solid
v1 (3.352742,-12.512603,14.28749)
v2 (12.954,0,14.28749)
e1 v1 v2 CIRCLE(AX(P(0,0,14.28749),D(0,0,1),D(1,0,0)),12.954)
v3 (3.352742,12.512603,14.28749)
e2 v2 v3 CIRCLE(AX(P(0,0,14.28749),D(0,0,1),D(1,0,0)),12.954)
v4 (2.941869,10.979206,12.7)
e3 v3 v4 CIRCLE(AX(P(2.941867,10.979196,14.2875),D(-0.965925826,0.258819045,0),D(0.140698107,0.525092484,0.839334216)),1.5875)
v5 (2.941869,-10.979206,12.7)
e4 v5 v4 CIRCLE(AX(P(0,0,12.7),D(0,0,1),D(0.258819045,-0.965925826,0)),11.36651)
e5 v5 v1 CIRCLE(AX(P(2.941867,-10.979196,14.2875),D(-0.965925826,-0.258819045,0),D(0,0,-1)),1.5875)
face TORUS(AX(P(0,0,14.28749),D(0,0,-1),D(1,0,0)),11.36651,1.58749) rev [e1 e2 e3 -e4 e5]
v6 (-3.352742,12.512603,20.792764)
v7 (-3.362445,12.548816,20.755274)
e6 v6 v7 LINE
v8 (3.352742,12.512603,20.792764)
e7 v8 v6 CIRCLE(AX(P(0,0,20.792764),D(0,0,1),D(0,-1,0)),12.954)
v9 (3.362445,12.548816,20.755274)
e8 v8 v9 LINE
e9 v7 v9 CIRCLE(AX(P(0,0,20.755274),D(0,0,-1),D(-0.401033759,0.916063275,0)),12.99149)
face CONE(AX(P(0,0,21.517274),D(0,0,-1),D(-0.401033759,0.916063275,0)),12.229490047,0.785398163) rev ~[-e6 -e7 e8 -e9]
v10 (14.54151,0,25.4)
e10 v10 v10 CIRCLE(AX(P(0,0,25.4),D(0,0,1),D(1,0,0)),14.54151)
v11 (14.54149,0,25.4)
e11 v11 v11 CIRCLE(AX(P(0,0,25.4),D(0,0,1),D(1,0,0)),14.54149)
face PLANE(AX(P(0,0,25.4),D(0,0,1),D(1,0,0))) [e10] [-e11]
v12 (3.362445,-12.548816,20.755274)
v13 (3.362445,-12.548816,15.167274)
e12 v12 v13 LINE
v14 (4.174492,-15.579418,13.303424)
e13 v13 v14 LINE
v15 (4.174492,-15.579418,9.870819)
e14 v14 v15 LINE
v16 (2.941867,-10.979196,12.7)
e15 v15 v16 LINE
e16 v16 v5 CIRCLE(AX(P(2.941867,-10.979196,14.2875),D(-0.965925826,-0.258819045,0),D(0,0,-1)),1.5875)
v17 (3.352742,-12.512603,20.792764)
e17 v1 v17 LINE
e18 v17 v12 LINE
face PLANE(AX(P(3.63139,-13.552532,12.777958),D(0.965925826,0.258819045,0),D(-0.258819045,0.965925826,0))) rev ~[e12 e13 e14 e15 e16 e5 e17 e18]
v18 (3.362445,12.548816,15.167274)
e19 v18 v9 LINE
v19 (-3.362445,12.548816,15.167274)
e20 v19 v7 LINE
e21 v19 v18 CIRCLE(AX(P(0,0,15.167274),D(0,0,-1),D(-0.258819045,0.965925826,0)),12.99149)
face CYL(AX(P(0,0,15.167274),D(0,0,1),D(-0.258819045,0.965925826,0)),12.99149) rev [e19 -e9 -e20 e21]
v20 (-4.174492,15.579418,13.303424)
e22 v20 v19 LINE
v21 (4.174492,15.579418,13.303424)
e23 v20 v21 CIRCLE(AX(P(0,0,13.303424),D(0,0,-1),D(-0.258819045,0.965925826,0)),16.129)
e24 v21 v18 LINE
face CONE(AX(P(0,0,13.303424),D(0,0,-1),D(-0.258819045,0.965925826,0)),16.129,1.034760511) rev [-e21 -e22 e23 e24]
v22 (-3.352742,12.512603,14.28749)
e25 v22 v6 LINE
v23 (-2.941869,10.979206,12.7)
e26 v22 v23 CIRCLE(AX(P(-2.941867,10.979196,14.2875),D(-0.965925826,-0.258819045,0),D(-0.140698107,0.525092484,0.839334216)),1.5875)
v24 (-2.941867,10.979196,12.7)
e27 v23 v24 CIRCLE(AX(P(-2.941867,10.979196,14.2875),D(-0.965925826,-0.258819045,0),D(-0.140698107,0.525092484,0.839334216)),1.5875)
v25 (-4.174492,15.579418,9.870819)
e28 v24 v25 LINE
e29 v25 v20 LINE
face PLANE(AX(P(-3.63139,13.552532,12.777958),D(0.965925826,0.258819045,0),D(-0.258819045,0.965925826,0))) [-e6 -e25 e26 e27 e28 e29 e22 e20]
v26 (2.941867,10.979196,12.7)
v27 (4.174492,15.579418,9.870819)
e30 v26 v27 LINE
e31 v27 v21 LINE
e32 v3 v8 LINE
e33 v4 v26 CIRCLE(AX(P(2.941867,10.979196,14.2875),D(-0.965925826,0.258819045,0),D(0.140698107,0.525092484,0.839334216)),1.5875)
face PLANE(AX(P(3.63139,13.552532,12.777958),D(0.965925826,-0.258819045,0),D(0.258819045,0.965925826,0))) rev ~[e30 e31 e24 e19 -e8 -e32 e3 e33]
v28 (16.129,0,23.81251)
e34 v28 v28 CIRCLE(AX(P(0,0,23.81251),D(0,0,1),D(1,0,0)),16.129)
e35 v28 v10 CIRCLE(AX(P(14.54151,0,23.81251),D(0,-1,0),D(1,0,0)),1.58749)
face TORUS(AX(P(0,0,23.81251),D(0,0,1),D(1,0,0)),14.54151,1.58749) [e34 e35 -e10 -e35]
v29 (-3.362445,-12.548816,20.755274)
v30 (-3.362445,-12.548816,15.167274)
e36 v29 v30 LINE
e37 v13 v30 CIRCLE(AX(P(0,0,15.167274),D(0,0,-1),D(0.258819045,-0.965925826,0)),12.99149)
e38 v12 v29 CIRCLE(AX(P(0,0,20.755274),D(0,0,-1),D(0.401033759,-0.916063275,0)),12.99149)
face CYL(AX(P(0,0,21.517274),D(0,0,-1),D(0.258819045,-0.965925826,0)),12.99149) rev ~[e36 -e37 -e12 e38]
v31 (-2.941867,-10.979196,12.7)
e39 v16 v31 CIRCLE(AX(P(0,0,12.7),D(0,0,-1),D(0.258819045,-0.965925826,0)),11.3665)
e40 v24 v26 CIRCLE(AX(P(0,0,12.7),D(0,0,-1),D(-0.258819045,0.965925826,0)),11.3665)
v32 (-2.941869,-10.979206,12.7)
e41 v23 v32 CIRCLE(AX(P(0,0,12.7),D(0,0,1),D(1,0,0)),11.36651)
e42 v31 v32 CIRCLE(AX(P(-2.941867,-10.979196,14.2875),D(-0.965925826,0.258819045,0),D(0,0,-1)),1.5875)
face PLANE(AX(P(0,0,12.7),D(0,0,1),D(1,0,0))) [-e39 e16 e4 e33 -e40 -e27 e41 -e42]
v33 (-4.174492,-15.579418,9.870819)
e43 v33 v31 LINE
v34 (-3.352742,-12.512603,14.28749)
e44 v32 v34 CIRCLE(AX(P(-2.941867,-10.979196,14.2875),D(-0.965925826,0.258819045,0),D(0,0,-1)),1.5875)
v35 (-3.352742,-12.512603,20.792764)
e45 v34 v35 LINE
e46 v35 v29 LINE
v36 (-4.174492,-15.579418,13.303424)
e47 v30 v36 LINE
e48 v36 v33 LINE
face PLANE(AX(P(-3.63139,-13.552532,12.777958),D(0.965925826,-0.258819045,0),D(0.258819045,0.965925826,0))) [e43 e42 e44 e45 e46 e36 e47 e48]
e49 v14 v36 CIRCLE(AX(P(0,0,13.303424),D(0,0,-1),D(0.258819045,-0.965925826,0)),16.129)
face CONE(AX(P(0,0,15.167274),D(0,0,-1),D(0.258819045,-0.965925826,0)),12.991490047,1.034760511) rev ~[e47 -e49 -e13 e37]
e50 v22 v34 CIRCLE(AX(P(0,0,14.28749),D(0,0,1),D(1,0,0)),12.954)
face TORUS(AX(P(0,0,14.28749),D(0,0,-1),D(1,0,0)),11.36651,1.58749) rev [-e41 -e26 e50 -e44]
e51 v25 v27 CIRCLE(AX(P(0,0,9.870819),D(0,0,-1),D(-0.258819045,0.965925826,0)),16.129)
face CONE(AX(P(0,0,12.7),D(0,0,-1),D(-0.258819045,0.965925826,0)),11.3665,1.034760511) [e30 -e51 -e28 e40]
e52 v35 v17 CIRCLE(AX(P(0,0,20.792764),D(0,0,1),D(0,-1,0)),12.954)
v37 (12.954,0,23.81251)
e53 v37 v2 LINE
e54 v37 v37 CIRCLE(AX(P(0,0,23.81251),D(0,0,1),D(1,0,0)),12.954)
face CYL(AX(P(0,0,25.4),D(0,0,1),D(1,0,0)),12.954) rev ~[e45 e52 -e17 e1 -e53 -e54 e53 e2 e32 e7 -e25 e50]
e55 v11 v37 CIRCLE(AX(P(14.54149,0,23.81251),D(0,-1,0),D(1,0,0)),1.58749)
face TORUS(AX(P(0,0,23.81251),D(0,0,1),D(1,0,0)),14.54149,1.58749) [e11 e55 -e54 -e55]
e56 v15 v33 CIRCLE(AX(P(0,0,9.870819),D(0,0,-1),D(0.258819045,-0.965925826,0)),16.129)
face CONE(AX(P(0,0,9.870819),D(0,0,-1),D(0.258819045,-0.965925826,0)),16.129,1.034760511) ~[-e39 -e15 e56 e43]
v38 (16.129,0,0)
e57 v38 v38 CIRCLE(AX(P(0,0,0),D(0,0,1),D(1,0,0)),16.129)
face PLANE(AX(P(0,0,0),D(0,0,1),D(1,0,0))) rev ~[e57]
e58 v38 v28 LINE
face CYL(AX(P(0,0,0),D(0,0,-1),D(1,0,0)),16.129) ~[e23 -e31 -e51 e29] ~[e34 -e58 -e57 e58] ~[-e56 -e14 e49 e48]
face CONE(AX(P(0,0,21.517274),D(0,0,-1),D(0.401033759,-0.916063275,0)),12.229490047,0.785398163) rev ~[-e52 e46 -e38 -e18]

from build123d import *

# Parameters (mm, degrees)
F1_R          = 16.129
F2_DEPTH      = 25.4
F3_R          = 12.954
F4_DEPTH      = 12.7
F5_R          = 1.58749
F7_ANGLE_BACK = 15
F7_ANGLE      = 30
F8_T4_ANGLE   = 47.2856392703
F8_S5_R       = 12.954
F8_T6_DEPTH   = 7
F8_T10_ANGLE  = 47.2856392703
F8_S11_R      = 12.954
F8_T12_DEPTH  = 7


# Not quite as in the source:
# - a fillet or chamfer that OpenCascade refuses, or shapes differently, is made with other operations: its cross-section is extruded or revolved along the edge and cut away or added
# - a fillet or chamfer is up to 0.001 mm smaller than in the source, because OpenCascade refuses the exact size
# - ends of sketch curves that miss each other by under 0.0002 mm in the source are joined


with BuildPart() as f2:
    # F1 (on Top) → F2 (new body)
    with BuildSketch(Plane.XY):
        Circle(F1_R)
    extrude(amount=F2_DEPTH)

    # F3 (on face) → F4 (cut)
    with BuildSketch(Plane.XY.offset(25.4)):
        Circle(F3_R)
    extrude(amount=-F4_DEPTH, mode=Mode.SUBTRACT)

    # F5 (radius 1.5875 in the source; OpenCascade refuses exactly that, so slightly less here)
    f5_edges = [f2.edges().sort_by_distance(p)[0] for p in [
        (-16.129, 0, 25.4),
        (-12.954, 0, 25.4),
        (-12.954, 0, 12.7),
    ]]
    fillet(f5_edges, radius=F5_R)

    # F6 (on Right) → F7 (revolve, cut)
    with BuildSketch(Plane.YZ, mode=Mode.PRIVATE) as f7_sk:
        with BuildLine():
            ThreePointArc((12.2294899884, 15.6199430682), (12.8889010018, 13.8375539592), (11.3665, 12.7))
            Line((11.3665, 12.7), (16.129, 9.8708188202))
            Line((16.129, 9.8708188202), (16.129, 13.3034244871))
            Line((16.129, 13.3034244871), (12.9914900466, 15.1672741693))
            Line((12.9914900466, 15.1672741693), (12.2294899884, 15.6199430682))
        make_face()
        with BuildLine():
            Line((-16.129, 9.8708188202), (-11.3665, 12.7))
            ThreePointArc((-11.3665, 12.7), (-12.8889010018, 13.8375539592), (-12.2294899884, 15.6199430682))
            Line((-12.2294899884, 15.6199430682), (-12.9914900466, 15.1672741693))
            Line((-12.9914900466, 15.1672741693), (-16.129, 13.3034244871))
            Line((-16.129, 13.3034244871), (-16.129, 9.8708188202))
        make_face()
        Polygon((12.2294900466, 21.5172741693), (12.2294900466, 15.6199431581), (12.9914900466, 15.1672741693), (12.9914900466, 21.5172741693), align=None)
        Polygon((-12.9914900466, 15.1672741693), (-12.2294900466, 15.6199431581), (-12.2294900466, 21.5172741693), (-12.9914900466, 21.5172741693), align=None)
    revolve(f7_sk.sketch.rotate(Axis((0, 0, 7.0286970586), (0, 0, -1)), -F7_ANGLE_BACK), axis=Axis((0, 0, 7.0286970586), (0, 0, -1)), revolution_arc=F7_ANGLE, mode=Mode.SUBTRACT)

    # F8: chamfer of 0.762 on 2 edges, made by hand


with BuildPart() as f8_tool2:
    # F8_s3 → F8_t4 (revolve)
    with BuildSketch(Plane(origin=(0, 0, 0), x_dir=(0, 0, 1), z_dir=(0.9160632754, 0.4010337585, 0))):
        Polygon((21.5172741693, 12.2294900466), (20.7552741693, 12.9914900466), (21.5172741693, 12.9914900466), align=None)
    revolve(axis=Axis((0, 0, 21.5172741693), (0, 0, -1)), revolution_arc=F8_T4_ANGLE)

    # F8_s5 → F8_t6 (cut, symmetric)
    with BuildSketch(Plane.XY.offset(21.1)):
        Circle(F8_S5_R)
    extrude(amount=F8_T6_DEPTH, both=True, mode=Mode.SUBTRACT)


with BuildPart() as f2_1:
    add(f2.part)

    # F8_t1: union F8_tool2
    add(f8_tool2.part)


with BuildPart() as f8_tool8:
    # F8_s9 → F8_t10 (revolve)
    with BuildSketch(Plane(origin=(0, 0, 0), x_dir=(0, 0, 1), z_dir=(-0.9160632754, -0.4010337585, 0))):
        Polygon((21.5172741693, 12.2294900466), (20.7552741693, 12.9914900466), (21.5172741693, 12.9914900466), align=None)
    revolve(axis=Axis((0, 0, 21.5172741693), (0, 0, -1)), revolution_arc=F8_T10_ANGLE)

    # F8_s11 → F8_t12 (cut, symmetric)
    with BuildSketch(Plane.XY.offset(21.1)):
        Circle(F8_S11_R)
    extrude(amount=F8_T12_DEPTH, both=True, mode=Mode.SUBTRACT)


with BuildPart() as f2_2:
    add(f2_1.part)

    # F8_t7: union F8_tool8
    add(f8_tool8.part)


solid = f2_2.part
